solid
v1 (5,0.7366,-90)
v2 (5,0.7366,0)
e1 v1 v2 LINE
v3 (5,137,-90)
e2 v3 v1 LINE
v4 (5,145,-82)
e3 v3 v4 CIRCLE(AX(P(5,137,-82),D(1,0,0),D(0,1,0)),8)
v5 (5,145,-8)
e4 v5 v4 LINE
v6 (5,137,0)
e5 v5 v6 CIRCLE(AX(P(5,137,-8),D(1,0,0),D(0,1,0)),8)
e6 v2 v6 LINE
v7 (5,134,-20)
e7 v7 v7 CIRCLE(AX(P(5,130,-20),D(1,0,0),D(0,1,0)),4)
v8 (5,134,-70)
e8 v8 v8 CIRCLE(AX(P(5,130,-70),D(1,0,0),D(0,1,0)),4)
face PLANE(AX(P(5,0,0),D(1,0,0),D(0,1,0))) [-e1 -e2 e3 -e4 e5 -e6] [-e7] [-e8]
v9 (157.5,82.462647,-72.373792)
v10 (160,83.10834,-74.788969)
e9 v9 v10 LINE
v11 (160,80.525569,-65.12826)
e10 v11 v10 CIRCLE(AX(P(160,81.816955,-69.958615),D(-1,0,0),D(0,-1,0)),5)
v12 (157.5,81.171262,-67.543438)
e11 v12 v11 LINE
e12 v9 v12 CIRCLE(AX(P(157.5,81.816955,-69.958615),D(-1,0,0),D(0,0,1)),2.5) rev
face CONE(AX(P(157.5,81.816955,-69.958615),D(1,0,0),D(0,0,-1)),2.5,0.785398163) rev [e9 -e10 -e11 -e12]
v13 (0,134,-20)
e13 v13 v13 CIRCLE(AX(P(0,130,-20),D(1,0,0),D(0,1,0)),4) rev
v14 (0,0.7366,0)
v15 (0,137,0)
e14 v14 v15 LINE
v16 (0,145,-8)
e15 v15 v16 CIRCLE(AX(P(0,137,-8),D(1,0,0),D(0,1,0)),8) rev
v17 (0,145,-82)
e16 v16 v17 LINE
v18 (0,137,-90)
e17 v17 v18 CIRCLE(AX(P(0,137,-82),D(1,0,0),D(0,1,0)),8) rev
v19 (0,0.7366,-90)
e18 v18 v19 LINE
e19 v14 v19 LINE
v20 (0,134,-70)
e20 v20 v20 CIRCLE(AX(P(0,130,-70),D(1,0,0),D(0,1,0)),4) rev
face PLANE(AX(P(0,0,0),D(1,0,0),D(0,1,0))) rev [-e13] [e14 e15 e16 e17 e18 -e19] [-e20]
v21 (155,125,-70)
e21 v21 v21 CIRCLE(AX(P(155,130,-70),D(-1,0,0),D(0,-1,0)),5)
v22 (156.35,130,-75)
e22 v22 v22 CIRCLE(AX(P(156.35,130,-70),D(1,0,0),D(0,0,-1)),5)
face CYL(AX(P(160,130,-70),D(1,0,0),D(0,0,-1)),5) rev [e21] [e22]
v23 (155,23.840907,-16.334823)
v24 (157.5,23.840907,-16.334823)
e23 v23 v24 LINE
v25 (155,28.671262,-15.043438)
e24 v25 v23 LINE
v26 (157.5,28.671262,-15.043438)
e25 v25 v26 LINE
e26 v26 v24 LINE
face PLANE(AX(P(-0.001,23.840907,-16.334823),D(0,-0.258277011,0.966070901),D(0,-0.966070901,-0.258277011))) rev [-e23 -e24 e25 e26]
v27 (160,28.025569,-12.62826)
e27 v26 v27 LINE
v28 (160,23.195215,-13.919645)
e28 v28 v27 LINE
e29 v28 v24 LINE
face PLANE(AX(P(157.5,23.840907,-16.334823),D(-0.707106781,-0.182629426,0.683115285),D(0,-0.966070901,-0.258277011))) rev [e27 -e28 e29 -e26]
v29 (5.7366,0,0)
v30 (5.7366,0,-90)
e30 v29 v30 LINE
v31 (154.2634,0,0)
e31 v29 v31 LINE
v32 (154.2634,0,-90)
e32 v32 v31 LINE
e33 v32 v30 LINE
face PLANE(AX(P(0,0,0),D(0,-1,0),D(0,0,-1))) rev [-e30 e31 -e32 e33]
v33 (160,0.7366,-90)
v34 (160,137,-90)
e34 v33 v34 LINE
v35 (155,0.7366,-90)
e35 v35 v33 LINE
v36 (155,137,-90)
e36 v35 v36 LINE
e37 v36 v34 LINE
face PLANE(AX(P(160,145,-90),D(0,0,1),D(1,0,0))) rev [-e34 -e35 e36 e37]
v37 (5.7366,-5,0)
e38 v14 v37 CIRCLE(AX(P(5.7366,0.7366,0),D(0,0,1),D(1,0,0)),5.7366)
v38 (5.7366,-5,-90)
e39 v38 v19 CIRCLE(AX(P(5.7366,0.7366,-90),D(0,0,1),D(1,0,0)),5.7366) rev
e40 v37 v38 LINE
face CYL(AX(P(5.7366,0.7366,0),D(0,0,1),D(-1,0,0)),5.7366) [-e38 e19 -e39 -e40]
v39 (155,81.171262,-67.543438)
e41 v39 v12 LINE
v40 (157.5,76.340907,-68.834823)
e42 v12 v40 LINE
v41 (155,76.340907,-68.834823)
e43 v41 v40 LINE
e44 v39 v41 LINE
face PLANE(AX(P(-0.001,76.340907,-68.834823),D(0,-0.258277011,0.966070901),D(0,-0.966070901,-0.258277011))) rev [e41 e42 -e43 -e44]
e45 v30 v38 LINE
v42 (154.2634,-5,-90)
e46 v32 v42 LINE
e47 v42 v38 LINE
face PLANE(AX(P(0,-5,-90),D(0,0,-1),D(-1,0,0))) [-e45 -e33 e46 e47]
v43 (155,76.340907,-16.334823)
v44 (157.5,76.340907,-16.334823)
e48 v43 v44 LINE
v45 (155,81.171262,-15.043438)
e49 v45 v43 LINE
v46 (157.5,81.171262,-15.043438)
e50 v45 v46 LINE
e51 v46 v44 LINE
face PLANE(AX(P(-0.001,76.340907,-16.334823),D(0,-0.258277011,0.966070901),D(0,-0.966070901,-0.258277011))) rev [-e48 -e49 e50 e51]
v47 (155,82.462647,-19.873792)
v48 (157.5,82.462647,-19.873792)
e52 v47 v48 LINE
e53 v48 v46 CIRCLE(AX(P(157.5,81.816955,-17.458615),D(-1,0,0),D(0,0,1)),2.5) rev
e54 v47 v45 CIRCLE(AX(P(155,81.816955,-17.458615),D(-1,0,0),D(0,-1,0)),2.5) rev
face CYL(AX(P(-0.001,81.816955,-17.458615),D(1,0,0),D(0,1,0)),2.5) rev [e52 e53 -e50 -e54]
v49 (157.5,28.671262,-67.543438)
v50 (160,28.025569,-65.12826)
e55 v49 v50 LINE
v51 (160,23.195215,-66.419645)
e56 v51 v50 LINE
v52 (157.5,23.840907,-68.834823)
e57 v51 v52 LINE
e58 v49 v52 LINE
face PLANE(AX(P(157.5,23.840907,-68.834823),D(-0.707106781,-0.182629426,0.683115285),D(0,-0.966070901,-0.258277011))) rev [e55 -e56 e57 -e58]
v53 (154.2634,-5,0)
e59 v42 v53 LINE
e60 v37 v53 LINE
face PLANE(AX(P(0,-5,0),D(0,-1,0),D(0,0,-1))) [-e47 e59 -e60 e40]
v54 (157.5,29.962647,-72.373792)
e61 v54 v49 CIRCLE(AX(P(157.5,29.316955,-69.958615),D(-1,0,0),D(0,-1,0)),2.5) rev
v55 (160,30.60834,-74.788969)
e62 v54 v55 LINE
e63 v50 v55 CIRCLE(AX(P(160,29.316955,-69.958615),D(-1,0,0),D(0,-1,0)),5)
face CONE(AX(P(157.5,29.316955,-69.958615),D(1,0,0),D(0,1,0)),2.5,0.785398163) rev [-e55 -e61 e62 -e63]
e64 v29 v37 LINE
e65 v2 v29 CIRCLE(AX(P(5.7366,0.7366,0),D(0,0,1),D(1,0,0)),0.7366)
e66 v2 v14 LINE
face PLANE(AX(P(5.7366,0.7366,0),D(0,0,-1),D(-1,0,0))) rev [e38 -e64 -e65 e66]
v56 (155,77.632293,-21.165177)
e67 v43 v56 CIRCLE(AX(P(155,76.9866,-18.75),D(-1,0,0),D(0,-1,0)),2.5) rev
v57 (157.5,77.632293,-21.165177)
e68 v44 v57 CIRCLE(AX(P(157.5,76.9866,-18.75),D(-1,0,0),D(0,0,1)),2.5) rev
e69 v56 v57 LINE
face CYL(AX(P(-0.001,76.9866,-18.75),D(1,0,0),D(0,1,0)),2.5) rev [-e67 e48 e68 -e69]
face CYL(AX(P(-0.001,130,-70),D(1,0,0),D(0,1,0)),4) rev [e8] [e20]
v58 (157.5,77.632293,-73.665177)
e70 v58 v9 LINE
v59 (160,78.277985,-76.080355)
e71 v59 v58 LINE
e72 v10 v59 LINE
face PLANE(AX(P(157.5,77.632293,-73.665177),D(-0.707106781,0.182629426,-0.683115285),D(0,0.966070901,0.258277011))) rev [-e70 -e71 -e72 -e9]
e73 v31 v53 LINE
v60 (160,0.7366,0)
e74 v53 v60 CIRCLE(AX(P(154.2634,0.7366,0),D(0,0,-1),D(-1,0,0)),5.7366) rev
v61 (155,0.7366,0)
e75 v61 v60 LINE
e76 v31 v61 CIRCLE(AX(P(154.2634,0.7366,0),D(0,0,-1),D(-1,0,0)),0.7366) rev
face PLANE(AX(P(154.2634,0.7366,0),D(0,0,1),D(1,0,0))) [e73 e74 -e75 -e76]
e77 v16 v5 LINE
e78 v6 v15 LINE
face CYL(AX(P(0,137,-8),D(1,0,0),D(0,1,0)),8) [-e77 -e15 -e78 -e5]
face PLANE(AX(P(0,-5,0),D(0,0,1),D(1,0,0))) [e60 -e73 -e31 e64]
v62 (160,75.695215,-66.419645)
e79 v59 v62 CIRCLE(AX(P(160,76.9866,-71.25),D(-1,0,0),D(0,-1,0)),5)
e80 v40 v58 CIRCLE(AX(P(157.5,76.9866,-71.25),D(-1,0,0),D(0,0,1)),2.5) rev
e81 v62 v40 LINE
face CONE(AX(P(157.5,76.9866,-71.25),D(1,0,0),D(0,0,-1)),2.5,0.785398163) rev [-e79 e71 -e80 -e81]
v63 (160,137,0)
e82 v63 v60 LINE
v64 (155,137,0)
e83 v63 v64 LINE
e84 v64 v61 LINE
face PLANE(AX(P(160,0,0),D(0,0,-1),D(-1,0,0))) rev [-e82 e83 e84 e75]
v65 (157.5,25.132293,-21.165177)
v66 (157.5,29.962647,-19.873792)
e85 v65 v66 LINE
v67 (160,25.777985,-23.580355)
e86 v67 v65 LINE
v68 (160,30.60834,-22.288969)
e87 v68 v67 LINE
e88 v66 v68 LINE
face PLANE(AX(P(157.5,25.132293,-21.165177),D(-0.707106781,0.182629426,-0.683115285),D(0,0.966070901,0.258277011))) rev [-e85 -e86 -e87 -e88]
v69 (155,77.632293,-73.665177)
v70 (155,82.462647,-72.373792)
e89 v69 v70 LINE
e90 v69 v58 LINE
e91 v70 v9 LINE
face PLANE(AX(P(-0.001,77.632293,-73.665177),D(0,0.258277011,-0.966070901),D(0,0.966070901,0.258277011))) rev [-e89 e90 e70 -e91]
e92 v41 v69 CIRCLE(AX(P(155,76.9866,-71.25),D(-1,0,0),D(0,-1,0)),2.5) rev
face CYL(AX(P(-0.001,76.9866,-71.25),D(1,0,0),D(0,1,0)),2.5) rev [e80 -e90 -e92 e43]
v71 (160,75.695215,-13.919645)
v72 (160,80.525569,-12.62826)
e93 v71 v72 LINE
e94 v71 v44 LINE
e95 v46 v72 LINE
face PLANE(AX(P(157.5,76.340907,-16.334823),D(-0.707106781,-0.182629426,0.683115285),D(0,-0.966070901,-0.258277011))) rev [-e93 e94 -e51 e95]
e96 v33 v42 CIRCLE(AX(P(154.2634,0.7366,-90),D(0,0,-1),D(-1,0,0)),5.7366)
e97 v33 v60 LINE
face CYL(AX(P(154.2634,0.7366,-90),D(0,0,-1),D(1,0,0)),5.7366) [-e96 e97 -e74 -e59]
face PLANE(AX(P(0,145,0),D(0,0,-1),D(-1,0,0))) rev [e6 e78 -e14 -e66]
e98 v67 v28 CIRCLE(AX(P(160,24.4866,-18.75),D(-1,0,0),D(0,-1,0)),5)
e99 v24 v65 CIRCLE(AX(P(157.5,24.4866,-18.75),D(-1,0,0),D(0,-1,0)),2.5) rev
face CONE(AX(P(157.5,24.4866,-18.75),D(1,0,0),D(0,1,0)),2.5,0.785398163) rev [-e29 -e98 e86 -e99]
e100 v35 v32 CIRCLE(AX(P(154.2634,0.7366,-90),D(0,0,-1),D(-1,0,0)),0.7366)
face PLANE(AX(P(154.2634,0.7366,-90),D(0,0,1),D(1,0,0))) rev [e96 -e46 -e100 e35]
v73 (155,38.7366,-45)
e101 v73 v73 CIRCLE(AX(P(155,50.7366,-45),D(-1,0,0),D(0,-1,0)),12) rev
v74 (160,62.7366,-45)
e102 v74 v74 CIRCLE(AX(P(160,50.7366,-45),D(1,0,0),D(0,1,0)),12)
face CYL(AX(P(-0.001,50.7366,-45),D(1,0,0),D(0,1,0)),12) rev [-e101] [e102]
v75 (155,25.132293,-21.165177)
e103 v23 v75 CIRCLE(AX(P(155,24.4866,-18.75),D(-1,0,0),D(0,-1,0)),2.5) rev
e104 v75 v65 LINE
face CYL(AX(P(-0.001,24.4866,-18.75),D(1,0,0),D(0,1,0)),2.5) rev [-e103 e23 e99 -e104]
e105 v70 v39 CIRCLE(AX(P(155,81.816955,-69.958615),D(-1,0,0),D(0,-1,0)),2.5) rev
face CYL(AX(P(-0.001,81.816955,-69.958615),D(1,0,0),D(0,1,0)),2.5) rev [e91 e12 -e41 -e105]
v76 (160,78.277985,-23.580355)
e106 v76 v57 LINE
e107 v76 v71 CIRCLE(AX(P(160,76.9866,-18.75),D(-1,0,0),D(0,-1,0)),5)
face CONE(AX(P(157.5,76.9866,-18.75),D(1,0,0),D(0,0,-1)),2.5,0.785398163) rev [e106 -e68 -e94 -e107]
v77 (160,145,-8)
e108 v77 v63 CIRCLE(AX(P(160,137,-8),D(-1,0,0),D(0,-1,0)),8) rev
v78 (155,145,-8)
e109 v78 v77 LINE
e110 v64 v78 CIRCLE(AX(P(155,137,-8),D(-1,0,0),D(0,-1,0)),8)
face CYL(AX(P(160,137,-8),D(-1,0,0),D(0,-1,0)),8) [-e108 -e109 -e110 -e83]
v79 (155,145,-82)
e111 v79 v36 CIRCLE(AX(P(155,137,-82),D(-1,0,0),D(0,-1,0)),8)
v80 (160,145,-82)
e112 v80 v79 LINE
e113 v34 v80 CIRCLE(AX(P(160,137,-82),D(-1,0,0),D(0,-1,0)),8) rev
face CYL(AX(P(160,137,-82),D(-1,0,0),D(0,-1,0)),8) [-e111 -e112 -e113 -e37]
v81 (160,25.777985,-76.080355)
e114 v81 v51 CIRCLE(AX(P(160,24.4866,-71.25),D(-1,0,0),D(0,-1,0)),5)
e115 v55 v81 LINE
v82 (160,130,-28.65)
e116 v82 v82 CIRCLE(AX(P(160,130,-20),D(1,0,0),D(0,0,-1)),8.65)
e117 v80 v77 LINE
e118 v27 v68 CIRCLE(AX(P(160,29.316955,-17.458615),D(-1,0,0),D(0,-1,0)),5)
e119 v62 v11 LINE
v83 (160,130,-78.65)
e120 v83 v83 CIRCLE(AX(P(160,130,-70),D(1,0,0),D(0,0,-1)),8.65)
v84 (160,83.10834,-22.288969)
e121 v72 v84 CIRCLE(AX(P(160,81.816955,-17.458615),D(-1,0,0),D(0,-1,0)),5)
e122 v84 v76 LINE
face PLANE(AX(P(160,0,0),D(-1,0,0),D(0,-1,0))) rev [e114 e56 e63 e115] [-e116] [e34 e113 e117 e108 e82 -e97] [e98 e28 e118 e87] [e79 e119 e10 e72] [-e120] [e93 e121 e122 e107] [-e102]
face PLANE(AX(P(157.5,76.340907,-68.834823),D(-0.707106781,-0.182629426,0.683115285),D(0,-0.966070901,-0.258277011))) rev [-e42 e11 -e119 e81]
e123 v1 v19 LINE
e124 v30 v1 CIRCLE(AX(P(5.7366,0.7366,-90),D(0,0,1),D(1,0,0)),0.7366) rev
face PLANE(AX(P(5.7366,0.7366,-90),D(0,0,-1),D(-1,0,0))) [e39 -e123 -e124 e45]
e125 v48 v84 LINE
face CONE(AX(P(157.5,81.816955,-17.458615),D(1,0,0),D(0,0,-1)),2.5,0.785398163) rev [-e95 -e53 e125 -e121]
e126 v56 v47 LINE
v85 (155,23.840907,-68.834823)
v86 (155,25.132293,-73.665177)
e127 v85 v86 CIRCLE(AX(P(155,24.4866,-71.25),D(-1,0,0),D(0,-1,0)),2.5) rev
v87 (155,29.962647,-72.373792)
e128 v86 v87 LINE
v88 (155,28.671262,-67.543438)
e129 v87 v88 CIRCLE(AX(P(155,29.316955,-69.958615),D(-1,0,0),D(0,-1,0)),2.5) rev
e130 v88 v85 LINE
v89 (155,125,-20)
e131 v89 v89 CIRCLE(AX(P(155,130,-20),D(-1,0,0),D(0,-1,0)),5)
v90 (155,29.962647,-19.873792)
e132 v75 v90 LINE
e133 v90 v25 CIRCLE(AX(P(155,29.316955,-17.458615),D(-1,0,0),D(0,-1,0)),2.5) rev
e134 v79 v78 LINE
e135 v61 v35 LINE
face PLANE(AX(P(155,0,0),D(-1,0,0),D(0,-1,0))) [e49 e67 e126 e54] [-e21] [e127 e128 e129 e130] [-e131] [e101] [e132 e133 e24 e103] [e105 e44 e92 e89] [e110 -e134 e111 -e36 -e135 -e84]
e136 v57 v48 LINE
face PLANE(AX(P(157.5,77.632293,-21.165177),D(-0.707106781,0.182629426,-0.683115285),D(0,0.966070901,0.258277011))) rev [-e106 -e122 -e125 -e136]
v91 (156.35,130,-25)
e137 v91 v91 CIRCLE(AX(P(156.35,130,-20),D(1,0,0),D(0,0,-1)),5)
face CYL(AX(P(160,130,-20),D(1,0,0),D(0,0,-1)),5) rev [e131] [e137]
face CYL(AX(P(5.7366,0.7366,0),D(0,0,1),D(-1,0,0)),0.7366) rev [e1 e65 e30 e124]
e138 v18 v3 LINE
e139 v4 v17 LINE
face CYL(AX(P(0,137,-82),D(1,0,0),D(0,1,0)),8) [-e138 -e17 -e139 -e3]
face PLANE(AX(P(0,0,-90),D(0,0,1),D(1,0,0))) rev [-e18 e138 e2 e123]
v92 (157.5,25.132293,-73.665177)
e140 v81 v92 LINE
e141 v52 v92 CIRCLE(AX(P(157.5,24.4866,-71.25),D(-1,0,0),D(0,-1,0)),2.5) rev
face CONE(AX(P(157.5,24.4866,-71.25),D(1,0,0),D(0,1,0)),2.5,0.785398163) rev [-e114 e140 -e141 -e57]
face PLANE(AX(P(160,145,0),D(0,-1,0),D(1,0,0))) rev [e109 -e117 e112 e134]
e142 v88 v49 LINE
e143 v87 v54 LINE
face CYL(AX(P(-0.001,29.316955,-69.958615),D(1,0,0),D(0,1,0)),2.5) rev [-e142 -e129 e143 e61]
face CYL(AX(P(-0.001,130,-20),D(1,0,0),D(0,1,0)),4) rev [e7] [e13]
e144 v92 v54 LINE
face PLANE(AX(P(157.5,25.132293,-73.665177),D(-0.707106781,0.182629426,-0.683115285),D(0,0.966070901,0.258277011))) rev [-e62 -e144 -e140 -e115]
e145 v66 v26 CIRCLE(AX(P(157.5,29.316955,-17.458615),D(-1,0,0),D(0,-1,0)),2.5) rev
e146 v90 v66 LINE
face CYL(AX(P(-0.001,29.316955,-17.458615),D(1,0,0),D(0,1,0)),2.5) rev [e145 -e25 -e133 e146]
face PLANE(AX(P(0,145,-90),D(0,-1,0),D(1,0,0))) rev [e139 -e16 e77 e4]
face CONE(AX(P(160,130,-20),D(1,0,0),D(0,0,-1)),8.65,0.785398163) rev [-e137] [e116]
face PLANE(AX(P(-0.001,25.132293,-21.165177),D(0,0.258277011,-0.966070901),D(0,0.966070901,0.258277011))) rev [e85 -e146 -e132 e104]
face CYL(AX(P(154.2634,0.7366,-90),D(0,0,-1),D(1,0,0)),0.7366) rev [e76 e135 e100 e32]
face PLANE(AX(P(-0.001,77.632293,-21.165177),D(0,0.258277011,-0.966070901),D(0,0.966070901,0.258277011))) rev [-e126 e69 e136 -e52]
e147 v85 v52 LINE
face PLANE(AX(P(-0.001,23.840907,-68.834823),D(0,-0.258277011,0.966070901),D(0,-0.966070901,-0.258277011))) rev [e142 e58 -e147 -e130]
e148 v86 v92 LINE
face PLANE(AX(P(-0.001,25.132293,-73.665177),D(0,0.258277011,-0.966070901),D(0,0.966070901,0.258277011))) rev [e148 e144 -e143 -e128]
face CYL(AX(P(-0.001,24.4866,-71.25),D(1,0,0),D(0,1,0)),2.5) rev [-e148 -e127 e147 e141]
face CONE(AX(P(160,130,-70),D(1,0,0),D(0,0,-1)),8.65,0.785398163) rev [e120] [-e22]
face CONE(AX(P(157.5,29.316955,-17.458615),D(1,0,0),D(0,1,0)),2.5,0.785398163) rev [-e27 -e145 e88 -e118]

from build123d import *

# Parameters (mm, degrees)
SKETCH5_W                                       = 160
SKETCH5_H                                       = 90
BASE_FLANGE1_DEPTH                              = 5
EDGE_FLANGE1_STRIP_W                            = 21.4732
EDGE_FLANGE1_STRIP_H                            = 5
EDGE_FLANGE1_STRIP_CUT_DEPTH                    = 90
EDGE_FLANGE1_STRIP_2_W                          = 21.4732
EDGE_FLANGE1_STRIP_2_H                          = 5
EDGE_FLANGE1_STRIP_CUT_2_DEPTH                  = 90
EDGE_FLANGE1_DEPTH                              = 90
EDGE_FLANGE1_BEND_DEPTH                         = 90
CUT_EXTRUDE1_REACH                              = 235.934
SKETCH16_R                                      = 12
SKETCH16_R_2                                    = 4
CUT_EXTRUDE2_REACH                              = 232.543
SKETCH20_R                                      = 4
CSK_FOR_M8_FLAT_HEAD_MACHINE_SCREW1_D           = 10
CSK_FOR_M8_FLAT_HEAD_MACHINE_SCREW1_DEPTH       = 10.25
CSK_FOR_M8_FLAT_HEAD_MACHINE_SCREW1_CSINK_D     = 17.3
CSK_FOR_M8_FLAT_HEAD_MACHINE_SCREW1_CSINK_ANGLE = 90
CSK_FOR_M8_FLAT_HEAD_MACHINE_SCREW1_TIP         = 3.004303095
BREAK_CORNER1_DEPTH                             = 160
CHAMFER2_SIZE                                   = 2.5


# Read off the part's stored shape, not the designer's step: Break-Corner1
# Sheet-metal steps are written as plain solids
with BuildPart() as part:
    # Sketch5 → Base-Flange1 (new body)
    with BuildSketch(Plane(origin=(0, 0, 0), x_dir=(1, 0, 0), z_dir=(0, 1, 0))):
        with Locations((80, 45)):
            Rectangle(SKETCH5_W, SKETCH5_H)
    extrude(amount=-BASE_FLANGE1_DEPTH)

    # Edge-Flange1 strip (across the edge) → Edge-Flange1 strip cut (cut)
    with BuildSketch(Plane.XY.offset(-90)):
        with Locations((-5, -2.5)):
            Rectangle(EDGE_FLANGE1_STRIP_W, EDGE_FLANGE1_STRIP_H)
    extrude(amount=EDGE_FLANGE1_STRIP_CUT_DEPTH, mode=Mode.SUBTRACT)

    # Edge-Flange1 strip 2 (across the edge) → Edge-Flange1 strip cut 2 (cut)
    with BuildSketch(Plane(origin=(160, 0, 0), x_dir=(-1, 0, 0), z_dir=(0, 0, -1))):
        with Locations((-5, -2.5)):
            Rectangle(EDGE_FLANGE1_STRIP_2_W, EDGE_FLANGE1_STRIP_2_H)
    extrude(amount=EDGE_FLANGE1_STRIP_CUT_2_DEPTH, mode=Mode.SUBTRACT)

    # Edge-Flange1 section (across the edge) → Edge-Flange1 (add)
    with BuildSketch(Plane.XY.offset(-90)):
        with BuildLine():
            Line((0, 0.7366), (0, 145))
            Line((0, 145), (5, 145))
            Line((5, 145), (5, 0.7366))
            ThreePointArc((5, 0.7366), (5.215745145, 0.215745145), (5.7366, 0))
            Line((5.7366, 0), (5.7366, -5))
            ThreePointArc((5.7366, -5), (1.680211239, -3.319788761), (0, 0.7366))
        make_face()
    extrude(amount=EDGE_FLANGE1_DEPTH)

    # Edge-Flange1 section 2 (across the edge) → Edge-Flange1 bend (add)
    with BuildSketch(Plane(origin=(160, 0, 0), x_dir=(-1, 0, 0), z_dir=(0, 0, -1))):
        with BuildLine():
            Line((0, 0.7366), (0, 145))
            Line((0, 145), (5, 145))
            Line((5, 145), (5, 0.7366))
            ThreePointArc((5, 0.7366), (5.215745145, 0.215745145), (5.7366, 0))
            Line((5.7366, 0), (5.7366, -5))
            ThreePointArc((5.7366, -5), (1.680211239, -3.319788761), (0, 0.7366))
        make_face()
    extrude(amount=EDGE_FLANGE1_BEND_DEPTH)

    # Sketch16 → Cut-Extrude1 (cut, up to next)
    with BuildSketch(Plane(origin=(160, 0, 0), x_dir=(0, 0, -1), z_dir=(1, 0, 0)), mode=Mode.PRIVATE) as cut_extrude1_sk1:
        with Locations(Location((45, 50.7366, 0), (0, 0, 90))):
            Circle(SKETCH16_R)
    cut_extrude1_tool1 = extrude(cut_extrude1_sk1.sketch, amount=-CUT_EXTRUDE1_REACH, mode=Mode.PRIVATE) & part.part
    # Sketch16 → Cut-Extrude1 (cut, up to next)
    with BuildSketch(Plane(origin=(160, 0, 0), x_dir=(0, 0, -1), z_dir=(1, 0, 0)), mode=Mode.PRIVATE) as cut_extrude1_sk2:
        with Locations(Location((20, 130, 0), (0, 0, 90))):
            Circle(SKETCH16_R_2)
    cut_extrude1_tool2 = extrude(cut_extrude1_sk2.sketch, amount=-CUT_EXTRUDE1_REACH, mode=Mode.PRIVATE) & part.part
    # Sketch16 → Cut-Extrude1 (cut, up to next)
    with BuildSketch(Plane(origin=(160, 0, 0), x_dir=(0, 0, -1), z_dir=(1, 0, 0)), mode=Mode.PRIVATE) as cut_extrude1_sk3:
        with Locations(Location((70, 130, 0), (0, 0, 270))):
            Circle(SKETCH16_R_2)
    cut_extrude1_tool3 = extrude(cut_extrude1_sk3.sketch, amount=-CUT_EXTRUDE1_REACH, mode=Mode.PRIVATE) & part.part
    # Sketch16 → Cut-Extrude1 (cut, up to next)
    with BuildSketch(Plane(origin=(160, 0, 0), x_dir=(0, 0, -1), z_dir=(1, 0, 0)), mode=Mode.PRIVATE) as cut_extrude1_sk4:
        with BuildLine():
            Line((16.334822748, 23.840907472), (15.043437692, 28.671261976))
            ThreePointArc((15.043437692, 28.671261976), (16.812922416, 31.732131756), (19.873792196, 29.962647032))
            Line((19.873792196, 29.962647032), (21.165177252, 25.132292528))
            ThreePointArc((21.165177252, 25.132292528), (19.395692528, 22.071422748), (16.334822748, 23.840907472))
        make_face()
    cut_extrude1_tool4 = extrude(cut_extrude1_sk4.sketch, amount=-CUT_EXTRUDE1_REACH, mode=Mode.PRIVATE) & part.part
    # Sketch16 → Cut-Extrude1 (cut, up to next)
    with BuildSketch(Plane(origin=(160, 0, 0), x_dir=(0, 0, -1), z_dir=(1, 0, 0)), mode=Mode.PRIVATE) as cut_extrude1_sk5:
        with BuildLine():
            Line((68.834822748, 23.840907472), (67.543437692, 28.671261976))
            ThreePointArc((67.543437692, 28.671261976), (69.312922416, 31.732131756), (72.373792196, 29.962647032))
            Line((72.373792196, 29.962647032), (73.665177252, 25.132292528))
            ThreePointArc((73.665177252, 25.132292528), (71.895692528, 22.071422748), (68.834822748, 23.840907472))
        make_face()
    cut_extrude1_tool5 = extrude(cut_extrude1_sk5.sketch, amount=-CUT_EXTRUDE1_REACH, mode=Mode.PRIVATE) & part.part
    # Sketch16 → Cut-Extrude1 (cut, up to next)
    with BuildSketch(Plane(origin=(160, 0, 0), x_dir=(0, 0, -1), z_dir=(1, 0, 0)), mode=Mode.PRIVATE) as cut_extrude1_sk6:
        with BuildLine():
            Line((16.334822748, 76.340907472), (15.043437692, 81.171261976))
            ThreePointArc((15.043437692, 81.171261976), (16.812922416, 84.232131756), (19.873792196, 82.462647032))
            Line((19.873792196, 82.462647032), (21.165177252, 77.632292528))
            ThreePointArc((21.165177252, 77.632292528), (19.395692528, 74.571422748), (16.334822748, 76.340907472))
        make_face()
    cut_extrude1_tool6 = extrude(cut_extrude1_sk6.sketch, amount=-CUT_EXTRUDE1_REACH, mode=Mode.PRIVATE) & part.part
    # Sketch16 → Cut-Extrude1 (cut, up to next)
    with BuildSketch(Plane(origin=(160, 0, 0), x_dir=(0, 0, -1), z_dir=(1, 0, 0)), mode=Mode.PRIVATE) as cut_extrude1_sk7:
        with BuildLine():
            Line((68.834822748, 76.340907472), (67.543437692, 81.171261976))
            ThreePointArc((67.543437692, 81.171261976), (69.312922416, 84.232131756), (72.373792196, 82.462647032))
            Line((72.373792196, 82.462647032), (73.665177252, 77.632292528))
            ThreePointArc((73.665177252, 77.632292528), (71.895692528, 74.571422748), (68.834822748, 76.340907472))
        make_face()
    cut_extrude1_tool7 = extrude(cut_extrude1_sk7.sketch, amount=-CUT_EXTRUDE1_REACH, mode=Mode.PRIVATE) & part.part
    add(cut_extrude1_tool1.solids().sort_by_distance((160, 50.7366, -45))[0], mode=Mode.SUBTRACT)
    add(cut_extrude1_tool2.solids().sort_by_distance((160, 130, -20))[0], mode=Mode.SUBTRACT)
    add(cut_extrude1_tool3.solids().sort_by_distance((160, 130, -70))[0], mode=Mode.SUBTRACT)
    add(cut_extrude1_tool4.solids().sort_by_distance((160, 26.901777, -18.104307))[0], mode=Mode.SUBTRACT)
    add(cut_extrude1_tool5.solids().sort_by_distance((160, 26.901777, -70.604307))[0], mode=Mode.SUBTRACT)
    add(cut_extrude1_tool6.solids().sort_by_distance((160, 79.401777, -18.104307))[0], mode=Mode.SUBTRACT)
    add(cut_extrude1_tool7.solids().sort_by_distance((160, 79.401777, -70.604307))[0], mode=Mode.SUBTRACT)

    # Sketch20 → Cut-Extrude2 (cut, up to next)
    with BuildSketch(Plane(origin=(5, 0, 0), x_dir=(0, 0, -1), z_dir=(1, 0, 0)), mode=Mode.PRIVATE) as cut_extrude2_sk1:
        with Locations(Location((70, 130, 0), (0, 0, 270))):
            Circle(SKETCH20_R)
    cut_extrude2_tool1 = extrude(cut_extrude2_sk1.sketch, amount=-CUT_EXTRUDE2_REACH, mode=Mode.PRIVATE) & part.part
    # Sketch20 → Cut-Extrude2 (cut, up to next)
    with BuildSketch(Plane(origin=(5, 0, 0), x_dir=(0, 0, -1), z_dir=(1, 0, 0)), mode=Mode.PRIVATE) as cut_extrude2_sk2:
        with Locations(Location((20, 130, 0), (0, 0, 90))):
            Circle(SKETCH20_R)
    cut_extrude2_tool2 = extrude(cut_extrude2_sk2.sketch, amount=-CUT_EXTRUDE2_REACH, mode=Mode.PRIVATE) & part.part
    add(cut_extrude2_tool1.solids().sort_by_distance((5, 130, -70))[0], mode=Mode.SUBTRACT)
    add(cut_extrude2_tool2.solids().sort_by_distance((5, 130, -20))[0], mode=Mode.SUBTRACT)

    # CSK for M8 Flat Head Machine Screw1
    with Locations(Plane(origin=(160, 0, 0), x_dir=(0, 0, -1), z_dir=(1, 0, 0))):
        with Locations((20, 130), (70, 130)):
            CounterSinkHole(CSK_FOR_M8_FLAT_HEAD_MACHINE_SCREW1_D / 2, CSK_FOR_M8_FLAT_HEAD_MACHINE_SCREW1_CSINK_D / 2, depth=CSK_FOR_M8_FLAT_HEAD_MACHINE_SCREW1_DEPTH, counter_sink_angle=CSK_FOR_M8_FLAT_HEAD_MACHINE_SCREW1_CSINK_ANGLE)
            with Locations((0, 0, -(CSK_FOR_M8_FLAT_HEAD_MACHINE_SCREW1_DEPTH + CSK_FOR_M8_FLAT_HEAD_MACHINE_SCREW1_TIP / 2))):  # 118° drill point
                Cone(0, CSK_FOR_M8_FLAT_HEAD_MACHINE_SCREW1_D / 2, CSK_FOR_M8_FLAT_HEAD_MACHINE_SCREW1_TIP, mode=Mode.SUBTRACT)

    # Break-Corner1 outline → Break-Corner1 (cut)
    with BuildSketch(Plane.YZ):
        with BuildLine():
            Line((145, -90), (145, -82))
            ThreePointArc((145, -82), (142.656854249, -87.656854249), (137, -90))
            Line((137, -90), (145, -90))
        make_face()
        with BuildLine():
            ThreePointArc((137, 0), (142.656854249, -2.343145751), (145, -8))
            Line((145, -8), (145, 0))
            Line((145, 0), (137, 0))
        make_face()
    extrude(amount=BREAK_CORNER1_DEPTH, mode=Mode.SUBTRACT)

    # Chamfer2
    chamfer2_edges = [part.edges().sort_by_distance(p)[0] for p in [
        (160, 22.071422748, -19.395692528),
        (160, 27.54746978, -20.519484724),
        (160, 31.732131756, -16.812922416),
        (160, 26.256084724, -15.68913022),
        (160, 22.071422748, -71.895692528),
        (160, 27.54746978, -73.019484724),
        (160, 31.732131756, -69.312922416),
        (160, 26.256084724, -68.18913022),
        (160, 74.571422748, -19.395692528),
        (160, 80.04746978, -20.519484724),
        (160, 84.232131756, -16.812922416),
        (160, 78.756084724, -15.68913022),
        (160, 74.571422748, -71.895692528),
        (160, 80.04746978, -73.019484724),
        (160, 84.232131756, -69.312922416),
        (160, 78.756084724, -68.18913022),
    ]]
    chamfer(chamfer2_edges, length=CHAMFER2_SIZE)


solid = part.part
